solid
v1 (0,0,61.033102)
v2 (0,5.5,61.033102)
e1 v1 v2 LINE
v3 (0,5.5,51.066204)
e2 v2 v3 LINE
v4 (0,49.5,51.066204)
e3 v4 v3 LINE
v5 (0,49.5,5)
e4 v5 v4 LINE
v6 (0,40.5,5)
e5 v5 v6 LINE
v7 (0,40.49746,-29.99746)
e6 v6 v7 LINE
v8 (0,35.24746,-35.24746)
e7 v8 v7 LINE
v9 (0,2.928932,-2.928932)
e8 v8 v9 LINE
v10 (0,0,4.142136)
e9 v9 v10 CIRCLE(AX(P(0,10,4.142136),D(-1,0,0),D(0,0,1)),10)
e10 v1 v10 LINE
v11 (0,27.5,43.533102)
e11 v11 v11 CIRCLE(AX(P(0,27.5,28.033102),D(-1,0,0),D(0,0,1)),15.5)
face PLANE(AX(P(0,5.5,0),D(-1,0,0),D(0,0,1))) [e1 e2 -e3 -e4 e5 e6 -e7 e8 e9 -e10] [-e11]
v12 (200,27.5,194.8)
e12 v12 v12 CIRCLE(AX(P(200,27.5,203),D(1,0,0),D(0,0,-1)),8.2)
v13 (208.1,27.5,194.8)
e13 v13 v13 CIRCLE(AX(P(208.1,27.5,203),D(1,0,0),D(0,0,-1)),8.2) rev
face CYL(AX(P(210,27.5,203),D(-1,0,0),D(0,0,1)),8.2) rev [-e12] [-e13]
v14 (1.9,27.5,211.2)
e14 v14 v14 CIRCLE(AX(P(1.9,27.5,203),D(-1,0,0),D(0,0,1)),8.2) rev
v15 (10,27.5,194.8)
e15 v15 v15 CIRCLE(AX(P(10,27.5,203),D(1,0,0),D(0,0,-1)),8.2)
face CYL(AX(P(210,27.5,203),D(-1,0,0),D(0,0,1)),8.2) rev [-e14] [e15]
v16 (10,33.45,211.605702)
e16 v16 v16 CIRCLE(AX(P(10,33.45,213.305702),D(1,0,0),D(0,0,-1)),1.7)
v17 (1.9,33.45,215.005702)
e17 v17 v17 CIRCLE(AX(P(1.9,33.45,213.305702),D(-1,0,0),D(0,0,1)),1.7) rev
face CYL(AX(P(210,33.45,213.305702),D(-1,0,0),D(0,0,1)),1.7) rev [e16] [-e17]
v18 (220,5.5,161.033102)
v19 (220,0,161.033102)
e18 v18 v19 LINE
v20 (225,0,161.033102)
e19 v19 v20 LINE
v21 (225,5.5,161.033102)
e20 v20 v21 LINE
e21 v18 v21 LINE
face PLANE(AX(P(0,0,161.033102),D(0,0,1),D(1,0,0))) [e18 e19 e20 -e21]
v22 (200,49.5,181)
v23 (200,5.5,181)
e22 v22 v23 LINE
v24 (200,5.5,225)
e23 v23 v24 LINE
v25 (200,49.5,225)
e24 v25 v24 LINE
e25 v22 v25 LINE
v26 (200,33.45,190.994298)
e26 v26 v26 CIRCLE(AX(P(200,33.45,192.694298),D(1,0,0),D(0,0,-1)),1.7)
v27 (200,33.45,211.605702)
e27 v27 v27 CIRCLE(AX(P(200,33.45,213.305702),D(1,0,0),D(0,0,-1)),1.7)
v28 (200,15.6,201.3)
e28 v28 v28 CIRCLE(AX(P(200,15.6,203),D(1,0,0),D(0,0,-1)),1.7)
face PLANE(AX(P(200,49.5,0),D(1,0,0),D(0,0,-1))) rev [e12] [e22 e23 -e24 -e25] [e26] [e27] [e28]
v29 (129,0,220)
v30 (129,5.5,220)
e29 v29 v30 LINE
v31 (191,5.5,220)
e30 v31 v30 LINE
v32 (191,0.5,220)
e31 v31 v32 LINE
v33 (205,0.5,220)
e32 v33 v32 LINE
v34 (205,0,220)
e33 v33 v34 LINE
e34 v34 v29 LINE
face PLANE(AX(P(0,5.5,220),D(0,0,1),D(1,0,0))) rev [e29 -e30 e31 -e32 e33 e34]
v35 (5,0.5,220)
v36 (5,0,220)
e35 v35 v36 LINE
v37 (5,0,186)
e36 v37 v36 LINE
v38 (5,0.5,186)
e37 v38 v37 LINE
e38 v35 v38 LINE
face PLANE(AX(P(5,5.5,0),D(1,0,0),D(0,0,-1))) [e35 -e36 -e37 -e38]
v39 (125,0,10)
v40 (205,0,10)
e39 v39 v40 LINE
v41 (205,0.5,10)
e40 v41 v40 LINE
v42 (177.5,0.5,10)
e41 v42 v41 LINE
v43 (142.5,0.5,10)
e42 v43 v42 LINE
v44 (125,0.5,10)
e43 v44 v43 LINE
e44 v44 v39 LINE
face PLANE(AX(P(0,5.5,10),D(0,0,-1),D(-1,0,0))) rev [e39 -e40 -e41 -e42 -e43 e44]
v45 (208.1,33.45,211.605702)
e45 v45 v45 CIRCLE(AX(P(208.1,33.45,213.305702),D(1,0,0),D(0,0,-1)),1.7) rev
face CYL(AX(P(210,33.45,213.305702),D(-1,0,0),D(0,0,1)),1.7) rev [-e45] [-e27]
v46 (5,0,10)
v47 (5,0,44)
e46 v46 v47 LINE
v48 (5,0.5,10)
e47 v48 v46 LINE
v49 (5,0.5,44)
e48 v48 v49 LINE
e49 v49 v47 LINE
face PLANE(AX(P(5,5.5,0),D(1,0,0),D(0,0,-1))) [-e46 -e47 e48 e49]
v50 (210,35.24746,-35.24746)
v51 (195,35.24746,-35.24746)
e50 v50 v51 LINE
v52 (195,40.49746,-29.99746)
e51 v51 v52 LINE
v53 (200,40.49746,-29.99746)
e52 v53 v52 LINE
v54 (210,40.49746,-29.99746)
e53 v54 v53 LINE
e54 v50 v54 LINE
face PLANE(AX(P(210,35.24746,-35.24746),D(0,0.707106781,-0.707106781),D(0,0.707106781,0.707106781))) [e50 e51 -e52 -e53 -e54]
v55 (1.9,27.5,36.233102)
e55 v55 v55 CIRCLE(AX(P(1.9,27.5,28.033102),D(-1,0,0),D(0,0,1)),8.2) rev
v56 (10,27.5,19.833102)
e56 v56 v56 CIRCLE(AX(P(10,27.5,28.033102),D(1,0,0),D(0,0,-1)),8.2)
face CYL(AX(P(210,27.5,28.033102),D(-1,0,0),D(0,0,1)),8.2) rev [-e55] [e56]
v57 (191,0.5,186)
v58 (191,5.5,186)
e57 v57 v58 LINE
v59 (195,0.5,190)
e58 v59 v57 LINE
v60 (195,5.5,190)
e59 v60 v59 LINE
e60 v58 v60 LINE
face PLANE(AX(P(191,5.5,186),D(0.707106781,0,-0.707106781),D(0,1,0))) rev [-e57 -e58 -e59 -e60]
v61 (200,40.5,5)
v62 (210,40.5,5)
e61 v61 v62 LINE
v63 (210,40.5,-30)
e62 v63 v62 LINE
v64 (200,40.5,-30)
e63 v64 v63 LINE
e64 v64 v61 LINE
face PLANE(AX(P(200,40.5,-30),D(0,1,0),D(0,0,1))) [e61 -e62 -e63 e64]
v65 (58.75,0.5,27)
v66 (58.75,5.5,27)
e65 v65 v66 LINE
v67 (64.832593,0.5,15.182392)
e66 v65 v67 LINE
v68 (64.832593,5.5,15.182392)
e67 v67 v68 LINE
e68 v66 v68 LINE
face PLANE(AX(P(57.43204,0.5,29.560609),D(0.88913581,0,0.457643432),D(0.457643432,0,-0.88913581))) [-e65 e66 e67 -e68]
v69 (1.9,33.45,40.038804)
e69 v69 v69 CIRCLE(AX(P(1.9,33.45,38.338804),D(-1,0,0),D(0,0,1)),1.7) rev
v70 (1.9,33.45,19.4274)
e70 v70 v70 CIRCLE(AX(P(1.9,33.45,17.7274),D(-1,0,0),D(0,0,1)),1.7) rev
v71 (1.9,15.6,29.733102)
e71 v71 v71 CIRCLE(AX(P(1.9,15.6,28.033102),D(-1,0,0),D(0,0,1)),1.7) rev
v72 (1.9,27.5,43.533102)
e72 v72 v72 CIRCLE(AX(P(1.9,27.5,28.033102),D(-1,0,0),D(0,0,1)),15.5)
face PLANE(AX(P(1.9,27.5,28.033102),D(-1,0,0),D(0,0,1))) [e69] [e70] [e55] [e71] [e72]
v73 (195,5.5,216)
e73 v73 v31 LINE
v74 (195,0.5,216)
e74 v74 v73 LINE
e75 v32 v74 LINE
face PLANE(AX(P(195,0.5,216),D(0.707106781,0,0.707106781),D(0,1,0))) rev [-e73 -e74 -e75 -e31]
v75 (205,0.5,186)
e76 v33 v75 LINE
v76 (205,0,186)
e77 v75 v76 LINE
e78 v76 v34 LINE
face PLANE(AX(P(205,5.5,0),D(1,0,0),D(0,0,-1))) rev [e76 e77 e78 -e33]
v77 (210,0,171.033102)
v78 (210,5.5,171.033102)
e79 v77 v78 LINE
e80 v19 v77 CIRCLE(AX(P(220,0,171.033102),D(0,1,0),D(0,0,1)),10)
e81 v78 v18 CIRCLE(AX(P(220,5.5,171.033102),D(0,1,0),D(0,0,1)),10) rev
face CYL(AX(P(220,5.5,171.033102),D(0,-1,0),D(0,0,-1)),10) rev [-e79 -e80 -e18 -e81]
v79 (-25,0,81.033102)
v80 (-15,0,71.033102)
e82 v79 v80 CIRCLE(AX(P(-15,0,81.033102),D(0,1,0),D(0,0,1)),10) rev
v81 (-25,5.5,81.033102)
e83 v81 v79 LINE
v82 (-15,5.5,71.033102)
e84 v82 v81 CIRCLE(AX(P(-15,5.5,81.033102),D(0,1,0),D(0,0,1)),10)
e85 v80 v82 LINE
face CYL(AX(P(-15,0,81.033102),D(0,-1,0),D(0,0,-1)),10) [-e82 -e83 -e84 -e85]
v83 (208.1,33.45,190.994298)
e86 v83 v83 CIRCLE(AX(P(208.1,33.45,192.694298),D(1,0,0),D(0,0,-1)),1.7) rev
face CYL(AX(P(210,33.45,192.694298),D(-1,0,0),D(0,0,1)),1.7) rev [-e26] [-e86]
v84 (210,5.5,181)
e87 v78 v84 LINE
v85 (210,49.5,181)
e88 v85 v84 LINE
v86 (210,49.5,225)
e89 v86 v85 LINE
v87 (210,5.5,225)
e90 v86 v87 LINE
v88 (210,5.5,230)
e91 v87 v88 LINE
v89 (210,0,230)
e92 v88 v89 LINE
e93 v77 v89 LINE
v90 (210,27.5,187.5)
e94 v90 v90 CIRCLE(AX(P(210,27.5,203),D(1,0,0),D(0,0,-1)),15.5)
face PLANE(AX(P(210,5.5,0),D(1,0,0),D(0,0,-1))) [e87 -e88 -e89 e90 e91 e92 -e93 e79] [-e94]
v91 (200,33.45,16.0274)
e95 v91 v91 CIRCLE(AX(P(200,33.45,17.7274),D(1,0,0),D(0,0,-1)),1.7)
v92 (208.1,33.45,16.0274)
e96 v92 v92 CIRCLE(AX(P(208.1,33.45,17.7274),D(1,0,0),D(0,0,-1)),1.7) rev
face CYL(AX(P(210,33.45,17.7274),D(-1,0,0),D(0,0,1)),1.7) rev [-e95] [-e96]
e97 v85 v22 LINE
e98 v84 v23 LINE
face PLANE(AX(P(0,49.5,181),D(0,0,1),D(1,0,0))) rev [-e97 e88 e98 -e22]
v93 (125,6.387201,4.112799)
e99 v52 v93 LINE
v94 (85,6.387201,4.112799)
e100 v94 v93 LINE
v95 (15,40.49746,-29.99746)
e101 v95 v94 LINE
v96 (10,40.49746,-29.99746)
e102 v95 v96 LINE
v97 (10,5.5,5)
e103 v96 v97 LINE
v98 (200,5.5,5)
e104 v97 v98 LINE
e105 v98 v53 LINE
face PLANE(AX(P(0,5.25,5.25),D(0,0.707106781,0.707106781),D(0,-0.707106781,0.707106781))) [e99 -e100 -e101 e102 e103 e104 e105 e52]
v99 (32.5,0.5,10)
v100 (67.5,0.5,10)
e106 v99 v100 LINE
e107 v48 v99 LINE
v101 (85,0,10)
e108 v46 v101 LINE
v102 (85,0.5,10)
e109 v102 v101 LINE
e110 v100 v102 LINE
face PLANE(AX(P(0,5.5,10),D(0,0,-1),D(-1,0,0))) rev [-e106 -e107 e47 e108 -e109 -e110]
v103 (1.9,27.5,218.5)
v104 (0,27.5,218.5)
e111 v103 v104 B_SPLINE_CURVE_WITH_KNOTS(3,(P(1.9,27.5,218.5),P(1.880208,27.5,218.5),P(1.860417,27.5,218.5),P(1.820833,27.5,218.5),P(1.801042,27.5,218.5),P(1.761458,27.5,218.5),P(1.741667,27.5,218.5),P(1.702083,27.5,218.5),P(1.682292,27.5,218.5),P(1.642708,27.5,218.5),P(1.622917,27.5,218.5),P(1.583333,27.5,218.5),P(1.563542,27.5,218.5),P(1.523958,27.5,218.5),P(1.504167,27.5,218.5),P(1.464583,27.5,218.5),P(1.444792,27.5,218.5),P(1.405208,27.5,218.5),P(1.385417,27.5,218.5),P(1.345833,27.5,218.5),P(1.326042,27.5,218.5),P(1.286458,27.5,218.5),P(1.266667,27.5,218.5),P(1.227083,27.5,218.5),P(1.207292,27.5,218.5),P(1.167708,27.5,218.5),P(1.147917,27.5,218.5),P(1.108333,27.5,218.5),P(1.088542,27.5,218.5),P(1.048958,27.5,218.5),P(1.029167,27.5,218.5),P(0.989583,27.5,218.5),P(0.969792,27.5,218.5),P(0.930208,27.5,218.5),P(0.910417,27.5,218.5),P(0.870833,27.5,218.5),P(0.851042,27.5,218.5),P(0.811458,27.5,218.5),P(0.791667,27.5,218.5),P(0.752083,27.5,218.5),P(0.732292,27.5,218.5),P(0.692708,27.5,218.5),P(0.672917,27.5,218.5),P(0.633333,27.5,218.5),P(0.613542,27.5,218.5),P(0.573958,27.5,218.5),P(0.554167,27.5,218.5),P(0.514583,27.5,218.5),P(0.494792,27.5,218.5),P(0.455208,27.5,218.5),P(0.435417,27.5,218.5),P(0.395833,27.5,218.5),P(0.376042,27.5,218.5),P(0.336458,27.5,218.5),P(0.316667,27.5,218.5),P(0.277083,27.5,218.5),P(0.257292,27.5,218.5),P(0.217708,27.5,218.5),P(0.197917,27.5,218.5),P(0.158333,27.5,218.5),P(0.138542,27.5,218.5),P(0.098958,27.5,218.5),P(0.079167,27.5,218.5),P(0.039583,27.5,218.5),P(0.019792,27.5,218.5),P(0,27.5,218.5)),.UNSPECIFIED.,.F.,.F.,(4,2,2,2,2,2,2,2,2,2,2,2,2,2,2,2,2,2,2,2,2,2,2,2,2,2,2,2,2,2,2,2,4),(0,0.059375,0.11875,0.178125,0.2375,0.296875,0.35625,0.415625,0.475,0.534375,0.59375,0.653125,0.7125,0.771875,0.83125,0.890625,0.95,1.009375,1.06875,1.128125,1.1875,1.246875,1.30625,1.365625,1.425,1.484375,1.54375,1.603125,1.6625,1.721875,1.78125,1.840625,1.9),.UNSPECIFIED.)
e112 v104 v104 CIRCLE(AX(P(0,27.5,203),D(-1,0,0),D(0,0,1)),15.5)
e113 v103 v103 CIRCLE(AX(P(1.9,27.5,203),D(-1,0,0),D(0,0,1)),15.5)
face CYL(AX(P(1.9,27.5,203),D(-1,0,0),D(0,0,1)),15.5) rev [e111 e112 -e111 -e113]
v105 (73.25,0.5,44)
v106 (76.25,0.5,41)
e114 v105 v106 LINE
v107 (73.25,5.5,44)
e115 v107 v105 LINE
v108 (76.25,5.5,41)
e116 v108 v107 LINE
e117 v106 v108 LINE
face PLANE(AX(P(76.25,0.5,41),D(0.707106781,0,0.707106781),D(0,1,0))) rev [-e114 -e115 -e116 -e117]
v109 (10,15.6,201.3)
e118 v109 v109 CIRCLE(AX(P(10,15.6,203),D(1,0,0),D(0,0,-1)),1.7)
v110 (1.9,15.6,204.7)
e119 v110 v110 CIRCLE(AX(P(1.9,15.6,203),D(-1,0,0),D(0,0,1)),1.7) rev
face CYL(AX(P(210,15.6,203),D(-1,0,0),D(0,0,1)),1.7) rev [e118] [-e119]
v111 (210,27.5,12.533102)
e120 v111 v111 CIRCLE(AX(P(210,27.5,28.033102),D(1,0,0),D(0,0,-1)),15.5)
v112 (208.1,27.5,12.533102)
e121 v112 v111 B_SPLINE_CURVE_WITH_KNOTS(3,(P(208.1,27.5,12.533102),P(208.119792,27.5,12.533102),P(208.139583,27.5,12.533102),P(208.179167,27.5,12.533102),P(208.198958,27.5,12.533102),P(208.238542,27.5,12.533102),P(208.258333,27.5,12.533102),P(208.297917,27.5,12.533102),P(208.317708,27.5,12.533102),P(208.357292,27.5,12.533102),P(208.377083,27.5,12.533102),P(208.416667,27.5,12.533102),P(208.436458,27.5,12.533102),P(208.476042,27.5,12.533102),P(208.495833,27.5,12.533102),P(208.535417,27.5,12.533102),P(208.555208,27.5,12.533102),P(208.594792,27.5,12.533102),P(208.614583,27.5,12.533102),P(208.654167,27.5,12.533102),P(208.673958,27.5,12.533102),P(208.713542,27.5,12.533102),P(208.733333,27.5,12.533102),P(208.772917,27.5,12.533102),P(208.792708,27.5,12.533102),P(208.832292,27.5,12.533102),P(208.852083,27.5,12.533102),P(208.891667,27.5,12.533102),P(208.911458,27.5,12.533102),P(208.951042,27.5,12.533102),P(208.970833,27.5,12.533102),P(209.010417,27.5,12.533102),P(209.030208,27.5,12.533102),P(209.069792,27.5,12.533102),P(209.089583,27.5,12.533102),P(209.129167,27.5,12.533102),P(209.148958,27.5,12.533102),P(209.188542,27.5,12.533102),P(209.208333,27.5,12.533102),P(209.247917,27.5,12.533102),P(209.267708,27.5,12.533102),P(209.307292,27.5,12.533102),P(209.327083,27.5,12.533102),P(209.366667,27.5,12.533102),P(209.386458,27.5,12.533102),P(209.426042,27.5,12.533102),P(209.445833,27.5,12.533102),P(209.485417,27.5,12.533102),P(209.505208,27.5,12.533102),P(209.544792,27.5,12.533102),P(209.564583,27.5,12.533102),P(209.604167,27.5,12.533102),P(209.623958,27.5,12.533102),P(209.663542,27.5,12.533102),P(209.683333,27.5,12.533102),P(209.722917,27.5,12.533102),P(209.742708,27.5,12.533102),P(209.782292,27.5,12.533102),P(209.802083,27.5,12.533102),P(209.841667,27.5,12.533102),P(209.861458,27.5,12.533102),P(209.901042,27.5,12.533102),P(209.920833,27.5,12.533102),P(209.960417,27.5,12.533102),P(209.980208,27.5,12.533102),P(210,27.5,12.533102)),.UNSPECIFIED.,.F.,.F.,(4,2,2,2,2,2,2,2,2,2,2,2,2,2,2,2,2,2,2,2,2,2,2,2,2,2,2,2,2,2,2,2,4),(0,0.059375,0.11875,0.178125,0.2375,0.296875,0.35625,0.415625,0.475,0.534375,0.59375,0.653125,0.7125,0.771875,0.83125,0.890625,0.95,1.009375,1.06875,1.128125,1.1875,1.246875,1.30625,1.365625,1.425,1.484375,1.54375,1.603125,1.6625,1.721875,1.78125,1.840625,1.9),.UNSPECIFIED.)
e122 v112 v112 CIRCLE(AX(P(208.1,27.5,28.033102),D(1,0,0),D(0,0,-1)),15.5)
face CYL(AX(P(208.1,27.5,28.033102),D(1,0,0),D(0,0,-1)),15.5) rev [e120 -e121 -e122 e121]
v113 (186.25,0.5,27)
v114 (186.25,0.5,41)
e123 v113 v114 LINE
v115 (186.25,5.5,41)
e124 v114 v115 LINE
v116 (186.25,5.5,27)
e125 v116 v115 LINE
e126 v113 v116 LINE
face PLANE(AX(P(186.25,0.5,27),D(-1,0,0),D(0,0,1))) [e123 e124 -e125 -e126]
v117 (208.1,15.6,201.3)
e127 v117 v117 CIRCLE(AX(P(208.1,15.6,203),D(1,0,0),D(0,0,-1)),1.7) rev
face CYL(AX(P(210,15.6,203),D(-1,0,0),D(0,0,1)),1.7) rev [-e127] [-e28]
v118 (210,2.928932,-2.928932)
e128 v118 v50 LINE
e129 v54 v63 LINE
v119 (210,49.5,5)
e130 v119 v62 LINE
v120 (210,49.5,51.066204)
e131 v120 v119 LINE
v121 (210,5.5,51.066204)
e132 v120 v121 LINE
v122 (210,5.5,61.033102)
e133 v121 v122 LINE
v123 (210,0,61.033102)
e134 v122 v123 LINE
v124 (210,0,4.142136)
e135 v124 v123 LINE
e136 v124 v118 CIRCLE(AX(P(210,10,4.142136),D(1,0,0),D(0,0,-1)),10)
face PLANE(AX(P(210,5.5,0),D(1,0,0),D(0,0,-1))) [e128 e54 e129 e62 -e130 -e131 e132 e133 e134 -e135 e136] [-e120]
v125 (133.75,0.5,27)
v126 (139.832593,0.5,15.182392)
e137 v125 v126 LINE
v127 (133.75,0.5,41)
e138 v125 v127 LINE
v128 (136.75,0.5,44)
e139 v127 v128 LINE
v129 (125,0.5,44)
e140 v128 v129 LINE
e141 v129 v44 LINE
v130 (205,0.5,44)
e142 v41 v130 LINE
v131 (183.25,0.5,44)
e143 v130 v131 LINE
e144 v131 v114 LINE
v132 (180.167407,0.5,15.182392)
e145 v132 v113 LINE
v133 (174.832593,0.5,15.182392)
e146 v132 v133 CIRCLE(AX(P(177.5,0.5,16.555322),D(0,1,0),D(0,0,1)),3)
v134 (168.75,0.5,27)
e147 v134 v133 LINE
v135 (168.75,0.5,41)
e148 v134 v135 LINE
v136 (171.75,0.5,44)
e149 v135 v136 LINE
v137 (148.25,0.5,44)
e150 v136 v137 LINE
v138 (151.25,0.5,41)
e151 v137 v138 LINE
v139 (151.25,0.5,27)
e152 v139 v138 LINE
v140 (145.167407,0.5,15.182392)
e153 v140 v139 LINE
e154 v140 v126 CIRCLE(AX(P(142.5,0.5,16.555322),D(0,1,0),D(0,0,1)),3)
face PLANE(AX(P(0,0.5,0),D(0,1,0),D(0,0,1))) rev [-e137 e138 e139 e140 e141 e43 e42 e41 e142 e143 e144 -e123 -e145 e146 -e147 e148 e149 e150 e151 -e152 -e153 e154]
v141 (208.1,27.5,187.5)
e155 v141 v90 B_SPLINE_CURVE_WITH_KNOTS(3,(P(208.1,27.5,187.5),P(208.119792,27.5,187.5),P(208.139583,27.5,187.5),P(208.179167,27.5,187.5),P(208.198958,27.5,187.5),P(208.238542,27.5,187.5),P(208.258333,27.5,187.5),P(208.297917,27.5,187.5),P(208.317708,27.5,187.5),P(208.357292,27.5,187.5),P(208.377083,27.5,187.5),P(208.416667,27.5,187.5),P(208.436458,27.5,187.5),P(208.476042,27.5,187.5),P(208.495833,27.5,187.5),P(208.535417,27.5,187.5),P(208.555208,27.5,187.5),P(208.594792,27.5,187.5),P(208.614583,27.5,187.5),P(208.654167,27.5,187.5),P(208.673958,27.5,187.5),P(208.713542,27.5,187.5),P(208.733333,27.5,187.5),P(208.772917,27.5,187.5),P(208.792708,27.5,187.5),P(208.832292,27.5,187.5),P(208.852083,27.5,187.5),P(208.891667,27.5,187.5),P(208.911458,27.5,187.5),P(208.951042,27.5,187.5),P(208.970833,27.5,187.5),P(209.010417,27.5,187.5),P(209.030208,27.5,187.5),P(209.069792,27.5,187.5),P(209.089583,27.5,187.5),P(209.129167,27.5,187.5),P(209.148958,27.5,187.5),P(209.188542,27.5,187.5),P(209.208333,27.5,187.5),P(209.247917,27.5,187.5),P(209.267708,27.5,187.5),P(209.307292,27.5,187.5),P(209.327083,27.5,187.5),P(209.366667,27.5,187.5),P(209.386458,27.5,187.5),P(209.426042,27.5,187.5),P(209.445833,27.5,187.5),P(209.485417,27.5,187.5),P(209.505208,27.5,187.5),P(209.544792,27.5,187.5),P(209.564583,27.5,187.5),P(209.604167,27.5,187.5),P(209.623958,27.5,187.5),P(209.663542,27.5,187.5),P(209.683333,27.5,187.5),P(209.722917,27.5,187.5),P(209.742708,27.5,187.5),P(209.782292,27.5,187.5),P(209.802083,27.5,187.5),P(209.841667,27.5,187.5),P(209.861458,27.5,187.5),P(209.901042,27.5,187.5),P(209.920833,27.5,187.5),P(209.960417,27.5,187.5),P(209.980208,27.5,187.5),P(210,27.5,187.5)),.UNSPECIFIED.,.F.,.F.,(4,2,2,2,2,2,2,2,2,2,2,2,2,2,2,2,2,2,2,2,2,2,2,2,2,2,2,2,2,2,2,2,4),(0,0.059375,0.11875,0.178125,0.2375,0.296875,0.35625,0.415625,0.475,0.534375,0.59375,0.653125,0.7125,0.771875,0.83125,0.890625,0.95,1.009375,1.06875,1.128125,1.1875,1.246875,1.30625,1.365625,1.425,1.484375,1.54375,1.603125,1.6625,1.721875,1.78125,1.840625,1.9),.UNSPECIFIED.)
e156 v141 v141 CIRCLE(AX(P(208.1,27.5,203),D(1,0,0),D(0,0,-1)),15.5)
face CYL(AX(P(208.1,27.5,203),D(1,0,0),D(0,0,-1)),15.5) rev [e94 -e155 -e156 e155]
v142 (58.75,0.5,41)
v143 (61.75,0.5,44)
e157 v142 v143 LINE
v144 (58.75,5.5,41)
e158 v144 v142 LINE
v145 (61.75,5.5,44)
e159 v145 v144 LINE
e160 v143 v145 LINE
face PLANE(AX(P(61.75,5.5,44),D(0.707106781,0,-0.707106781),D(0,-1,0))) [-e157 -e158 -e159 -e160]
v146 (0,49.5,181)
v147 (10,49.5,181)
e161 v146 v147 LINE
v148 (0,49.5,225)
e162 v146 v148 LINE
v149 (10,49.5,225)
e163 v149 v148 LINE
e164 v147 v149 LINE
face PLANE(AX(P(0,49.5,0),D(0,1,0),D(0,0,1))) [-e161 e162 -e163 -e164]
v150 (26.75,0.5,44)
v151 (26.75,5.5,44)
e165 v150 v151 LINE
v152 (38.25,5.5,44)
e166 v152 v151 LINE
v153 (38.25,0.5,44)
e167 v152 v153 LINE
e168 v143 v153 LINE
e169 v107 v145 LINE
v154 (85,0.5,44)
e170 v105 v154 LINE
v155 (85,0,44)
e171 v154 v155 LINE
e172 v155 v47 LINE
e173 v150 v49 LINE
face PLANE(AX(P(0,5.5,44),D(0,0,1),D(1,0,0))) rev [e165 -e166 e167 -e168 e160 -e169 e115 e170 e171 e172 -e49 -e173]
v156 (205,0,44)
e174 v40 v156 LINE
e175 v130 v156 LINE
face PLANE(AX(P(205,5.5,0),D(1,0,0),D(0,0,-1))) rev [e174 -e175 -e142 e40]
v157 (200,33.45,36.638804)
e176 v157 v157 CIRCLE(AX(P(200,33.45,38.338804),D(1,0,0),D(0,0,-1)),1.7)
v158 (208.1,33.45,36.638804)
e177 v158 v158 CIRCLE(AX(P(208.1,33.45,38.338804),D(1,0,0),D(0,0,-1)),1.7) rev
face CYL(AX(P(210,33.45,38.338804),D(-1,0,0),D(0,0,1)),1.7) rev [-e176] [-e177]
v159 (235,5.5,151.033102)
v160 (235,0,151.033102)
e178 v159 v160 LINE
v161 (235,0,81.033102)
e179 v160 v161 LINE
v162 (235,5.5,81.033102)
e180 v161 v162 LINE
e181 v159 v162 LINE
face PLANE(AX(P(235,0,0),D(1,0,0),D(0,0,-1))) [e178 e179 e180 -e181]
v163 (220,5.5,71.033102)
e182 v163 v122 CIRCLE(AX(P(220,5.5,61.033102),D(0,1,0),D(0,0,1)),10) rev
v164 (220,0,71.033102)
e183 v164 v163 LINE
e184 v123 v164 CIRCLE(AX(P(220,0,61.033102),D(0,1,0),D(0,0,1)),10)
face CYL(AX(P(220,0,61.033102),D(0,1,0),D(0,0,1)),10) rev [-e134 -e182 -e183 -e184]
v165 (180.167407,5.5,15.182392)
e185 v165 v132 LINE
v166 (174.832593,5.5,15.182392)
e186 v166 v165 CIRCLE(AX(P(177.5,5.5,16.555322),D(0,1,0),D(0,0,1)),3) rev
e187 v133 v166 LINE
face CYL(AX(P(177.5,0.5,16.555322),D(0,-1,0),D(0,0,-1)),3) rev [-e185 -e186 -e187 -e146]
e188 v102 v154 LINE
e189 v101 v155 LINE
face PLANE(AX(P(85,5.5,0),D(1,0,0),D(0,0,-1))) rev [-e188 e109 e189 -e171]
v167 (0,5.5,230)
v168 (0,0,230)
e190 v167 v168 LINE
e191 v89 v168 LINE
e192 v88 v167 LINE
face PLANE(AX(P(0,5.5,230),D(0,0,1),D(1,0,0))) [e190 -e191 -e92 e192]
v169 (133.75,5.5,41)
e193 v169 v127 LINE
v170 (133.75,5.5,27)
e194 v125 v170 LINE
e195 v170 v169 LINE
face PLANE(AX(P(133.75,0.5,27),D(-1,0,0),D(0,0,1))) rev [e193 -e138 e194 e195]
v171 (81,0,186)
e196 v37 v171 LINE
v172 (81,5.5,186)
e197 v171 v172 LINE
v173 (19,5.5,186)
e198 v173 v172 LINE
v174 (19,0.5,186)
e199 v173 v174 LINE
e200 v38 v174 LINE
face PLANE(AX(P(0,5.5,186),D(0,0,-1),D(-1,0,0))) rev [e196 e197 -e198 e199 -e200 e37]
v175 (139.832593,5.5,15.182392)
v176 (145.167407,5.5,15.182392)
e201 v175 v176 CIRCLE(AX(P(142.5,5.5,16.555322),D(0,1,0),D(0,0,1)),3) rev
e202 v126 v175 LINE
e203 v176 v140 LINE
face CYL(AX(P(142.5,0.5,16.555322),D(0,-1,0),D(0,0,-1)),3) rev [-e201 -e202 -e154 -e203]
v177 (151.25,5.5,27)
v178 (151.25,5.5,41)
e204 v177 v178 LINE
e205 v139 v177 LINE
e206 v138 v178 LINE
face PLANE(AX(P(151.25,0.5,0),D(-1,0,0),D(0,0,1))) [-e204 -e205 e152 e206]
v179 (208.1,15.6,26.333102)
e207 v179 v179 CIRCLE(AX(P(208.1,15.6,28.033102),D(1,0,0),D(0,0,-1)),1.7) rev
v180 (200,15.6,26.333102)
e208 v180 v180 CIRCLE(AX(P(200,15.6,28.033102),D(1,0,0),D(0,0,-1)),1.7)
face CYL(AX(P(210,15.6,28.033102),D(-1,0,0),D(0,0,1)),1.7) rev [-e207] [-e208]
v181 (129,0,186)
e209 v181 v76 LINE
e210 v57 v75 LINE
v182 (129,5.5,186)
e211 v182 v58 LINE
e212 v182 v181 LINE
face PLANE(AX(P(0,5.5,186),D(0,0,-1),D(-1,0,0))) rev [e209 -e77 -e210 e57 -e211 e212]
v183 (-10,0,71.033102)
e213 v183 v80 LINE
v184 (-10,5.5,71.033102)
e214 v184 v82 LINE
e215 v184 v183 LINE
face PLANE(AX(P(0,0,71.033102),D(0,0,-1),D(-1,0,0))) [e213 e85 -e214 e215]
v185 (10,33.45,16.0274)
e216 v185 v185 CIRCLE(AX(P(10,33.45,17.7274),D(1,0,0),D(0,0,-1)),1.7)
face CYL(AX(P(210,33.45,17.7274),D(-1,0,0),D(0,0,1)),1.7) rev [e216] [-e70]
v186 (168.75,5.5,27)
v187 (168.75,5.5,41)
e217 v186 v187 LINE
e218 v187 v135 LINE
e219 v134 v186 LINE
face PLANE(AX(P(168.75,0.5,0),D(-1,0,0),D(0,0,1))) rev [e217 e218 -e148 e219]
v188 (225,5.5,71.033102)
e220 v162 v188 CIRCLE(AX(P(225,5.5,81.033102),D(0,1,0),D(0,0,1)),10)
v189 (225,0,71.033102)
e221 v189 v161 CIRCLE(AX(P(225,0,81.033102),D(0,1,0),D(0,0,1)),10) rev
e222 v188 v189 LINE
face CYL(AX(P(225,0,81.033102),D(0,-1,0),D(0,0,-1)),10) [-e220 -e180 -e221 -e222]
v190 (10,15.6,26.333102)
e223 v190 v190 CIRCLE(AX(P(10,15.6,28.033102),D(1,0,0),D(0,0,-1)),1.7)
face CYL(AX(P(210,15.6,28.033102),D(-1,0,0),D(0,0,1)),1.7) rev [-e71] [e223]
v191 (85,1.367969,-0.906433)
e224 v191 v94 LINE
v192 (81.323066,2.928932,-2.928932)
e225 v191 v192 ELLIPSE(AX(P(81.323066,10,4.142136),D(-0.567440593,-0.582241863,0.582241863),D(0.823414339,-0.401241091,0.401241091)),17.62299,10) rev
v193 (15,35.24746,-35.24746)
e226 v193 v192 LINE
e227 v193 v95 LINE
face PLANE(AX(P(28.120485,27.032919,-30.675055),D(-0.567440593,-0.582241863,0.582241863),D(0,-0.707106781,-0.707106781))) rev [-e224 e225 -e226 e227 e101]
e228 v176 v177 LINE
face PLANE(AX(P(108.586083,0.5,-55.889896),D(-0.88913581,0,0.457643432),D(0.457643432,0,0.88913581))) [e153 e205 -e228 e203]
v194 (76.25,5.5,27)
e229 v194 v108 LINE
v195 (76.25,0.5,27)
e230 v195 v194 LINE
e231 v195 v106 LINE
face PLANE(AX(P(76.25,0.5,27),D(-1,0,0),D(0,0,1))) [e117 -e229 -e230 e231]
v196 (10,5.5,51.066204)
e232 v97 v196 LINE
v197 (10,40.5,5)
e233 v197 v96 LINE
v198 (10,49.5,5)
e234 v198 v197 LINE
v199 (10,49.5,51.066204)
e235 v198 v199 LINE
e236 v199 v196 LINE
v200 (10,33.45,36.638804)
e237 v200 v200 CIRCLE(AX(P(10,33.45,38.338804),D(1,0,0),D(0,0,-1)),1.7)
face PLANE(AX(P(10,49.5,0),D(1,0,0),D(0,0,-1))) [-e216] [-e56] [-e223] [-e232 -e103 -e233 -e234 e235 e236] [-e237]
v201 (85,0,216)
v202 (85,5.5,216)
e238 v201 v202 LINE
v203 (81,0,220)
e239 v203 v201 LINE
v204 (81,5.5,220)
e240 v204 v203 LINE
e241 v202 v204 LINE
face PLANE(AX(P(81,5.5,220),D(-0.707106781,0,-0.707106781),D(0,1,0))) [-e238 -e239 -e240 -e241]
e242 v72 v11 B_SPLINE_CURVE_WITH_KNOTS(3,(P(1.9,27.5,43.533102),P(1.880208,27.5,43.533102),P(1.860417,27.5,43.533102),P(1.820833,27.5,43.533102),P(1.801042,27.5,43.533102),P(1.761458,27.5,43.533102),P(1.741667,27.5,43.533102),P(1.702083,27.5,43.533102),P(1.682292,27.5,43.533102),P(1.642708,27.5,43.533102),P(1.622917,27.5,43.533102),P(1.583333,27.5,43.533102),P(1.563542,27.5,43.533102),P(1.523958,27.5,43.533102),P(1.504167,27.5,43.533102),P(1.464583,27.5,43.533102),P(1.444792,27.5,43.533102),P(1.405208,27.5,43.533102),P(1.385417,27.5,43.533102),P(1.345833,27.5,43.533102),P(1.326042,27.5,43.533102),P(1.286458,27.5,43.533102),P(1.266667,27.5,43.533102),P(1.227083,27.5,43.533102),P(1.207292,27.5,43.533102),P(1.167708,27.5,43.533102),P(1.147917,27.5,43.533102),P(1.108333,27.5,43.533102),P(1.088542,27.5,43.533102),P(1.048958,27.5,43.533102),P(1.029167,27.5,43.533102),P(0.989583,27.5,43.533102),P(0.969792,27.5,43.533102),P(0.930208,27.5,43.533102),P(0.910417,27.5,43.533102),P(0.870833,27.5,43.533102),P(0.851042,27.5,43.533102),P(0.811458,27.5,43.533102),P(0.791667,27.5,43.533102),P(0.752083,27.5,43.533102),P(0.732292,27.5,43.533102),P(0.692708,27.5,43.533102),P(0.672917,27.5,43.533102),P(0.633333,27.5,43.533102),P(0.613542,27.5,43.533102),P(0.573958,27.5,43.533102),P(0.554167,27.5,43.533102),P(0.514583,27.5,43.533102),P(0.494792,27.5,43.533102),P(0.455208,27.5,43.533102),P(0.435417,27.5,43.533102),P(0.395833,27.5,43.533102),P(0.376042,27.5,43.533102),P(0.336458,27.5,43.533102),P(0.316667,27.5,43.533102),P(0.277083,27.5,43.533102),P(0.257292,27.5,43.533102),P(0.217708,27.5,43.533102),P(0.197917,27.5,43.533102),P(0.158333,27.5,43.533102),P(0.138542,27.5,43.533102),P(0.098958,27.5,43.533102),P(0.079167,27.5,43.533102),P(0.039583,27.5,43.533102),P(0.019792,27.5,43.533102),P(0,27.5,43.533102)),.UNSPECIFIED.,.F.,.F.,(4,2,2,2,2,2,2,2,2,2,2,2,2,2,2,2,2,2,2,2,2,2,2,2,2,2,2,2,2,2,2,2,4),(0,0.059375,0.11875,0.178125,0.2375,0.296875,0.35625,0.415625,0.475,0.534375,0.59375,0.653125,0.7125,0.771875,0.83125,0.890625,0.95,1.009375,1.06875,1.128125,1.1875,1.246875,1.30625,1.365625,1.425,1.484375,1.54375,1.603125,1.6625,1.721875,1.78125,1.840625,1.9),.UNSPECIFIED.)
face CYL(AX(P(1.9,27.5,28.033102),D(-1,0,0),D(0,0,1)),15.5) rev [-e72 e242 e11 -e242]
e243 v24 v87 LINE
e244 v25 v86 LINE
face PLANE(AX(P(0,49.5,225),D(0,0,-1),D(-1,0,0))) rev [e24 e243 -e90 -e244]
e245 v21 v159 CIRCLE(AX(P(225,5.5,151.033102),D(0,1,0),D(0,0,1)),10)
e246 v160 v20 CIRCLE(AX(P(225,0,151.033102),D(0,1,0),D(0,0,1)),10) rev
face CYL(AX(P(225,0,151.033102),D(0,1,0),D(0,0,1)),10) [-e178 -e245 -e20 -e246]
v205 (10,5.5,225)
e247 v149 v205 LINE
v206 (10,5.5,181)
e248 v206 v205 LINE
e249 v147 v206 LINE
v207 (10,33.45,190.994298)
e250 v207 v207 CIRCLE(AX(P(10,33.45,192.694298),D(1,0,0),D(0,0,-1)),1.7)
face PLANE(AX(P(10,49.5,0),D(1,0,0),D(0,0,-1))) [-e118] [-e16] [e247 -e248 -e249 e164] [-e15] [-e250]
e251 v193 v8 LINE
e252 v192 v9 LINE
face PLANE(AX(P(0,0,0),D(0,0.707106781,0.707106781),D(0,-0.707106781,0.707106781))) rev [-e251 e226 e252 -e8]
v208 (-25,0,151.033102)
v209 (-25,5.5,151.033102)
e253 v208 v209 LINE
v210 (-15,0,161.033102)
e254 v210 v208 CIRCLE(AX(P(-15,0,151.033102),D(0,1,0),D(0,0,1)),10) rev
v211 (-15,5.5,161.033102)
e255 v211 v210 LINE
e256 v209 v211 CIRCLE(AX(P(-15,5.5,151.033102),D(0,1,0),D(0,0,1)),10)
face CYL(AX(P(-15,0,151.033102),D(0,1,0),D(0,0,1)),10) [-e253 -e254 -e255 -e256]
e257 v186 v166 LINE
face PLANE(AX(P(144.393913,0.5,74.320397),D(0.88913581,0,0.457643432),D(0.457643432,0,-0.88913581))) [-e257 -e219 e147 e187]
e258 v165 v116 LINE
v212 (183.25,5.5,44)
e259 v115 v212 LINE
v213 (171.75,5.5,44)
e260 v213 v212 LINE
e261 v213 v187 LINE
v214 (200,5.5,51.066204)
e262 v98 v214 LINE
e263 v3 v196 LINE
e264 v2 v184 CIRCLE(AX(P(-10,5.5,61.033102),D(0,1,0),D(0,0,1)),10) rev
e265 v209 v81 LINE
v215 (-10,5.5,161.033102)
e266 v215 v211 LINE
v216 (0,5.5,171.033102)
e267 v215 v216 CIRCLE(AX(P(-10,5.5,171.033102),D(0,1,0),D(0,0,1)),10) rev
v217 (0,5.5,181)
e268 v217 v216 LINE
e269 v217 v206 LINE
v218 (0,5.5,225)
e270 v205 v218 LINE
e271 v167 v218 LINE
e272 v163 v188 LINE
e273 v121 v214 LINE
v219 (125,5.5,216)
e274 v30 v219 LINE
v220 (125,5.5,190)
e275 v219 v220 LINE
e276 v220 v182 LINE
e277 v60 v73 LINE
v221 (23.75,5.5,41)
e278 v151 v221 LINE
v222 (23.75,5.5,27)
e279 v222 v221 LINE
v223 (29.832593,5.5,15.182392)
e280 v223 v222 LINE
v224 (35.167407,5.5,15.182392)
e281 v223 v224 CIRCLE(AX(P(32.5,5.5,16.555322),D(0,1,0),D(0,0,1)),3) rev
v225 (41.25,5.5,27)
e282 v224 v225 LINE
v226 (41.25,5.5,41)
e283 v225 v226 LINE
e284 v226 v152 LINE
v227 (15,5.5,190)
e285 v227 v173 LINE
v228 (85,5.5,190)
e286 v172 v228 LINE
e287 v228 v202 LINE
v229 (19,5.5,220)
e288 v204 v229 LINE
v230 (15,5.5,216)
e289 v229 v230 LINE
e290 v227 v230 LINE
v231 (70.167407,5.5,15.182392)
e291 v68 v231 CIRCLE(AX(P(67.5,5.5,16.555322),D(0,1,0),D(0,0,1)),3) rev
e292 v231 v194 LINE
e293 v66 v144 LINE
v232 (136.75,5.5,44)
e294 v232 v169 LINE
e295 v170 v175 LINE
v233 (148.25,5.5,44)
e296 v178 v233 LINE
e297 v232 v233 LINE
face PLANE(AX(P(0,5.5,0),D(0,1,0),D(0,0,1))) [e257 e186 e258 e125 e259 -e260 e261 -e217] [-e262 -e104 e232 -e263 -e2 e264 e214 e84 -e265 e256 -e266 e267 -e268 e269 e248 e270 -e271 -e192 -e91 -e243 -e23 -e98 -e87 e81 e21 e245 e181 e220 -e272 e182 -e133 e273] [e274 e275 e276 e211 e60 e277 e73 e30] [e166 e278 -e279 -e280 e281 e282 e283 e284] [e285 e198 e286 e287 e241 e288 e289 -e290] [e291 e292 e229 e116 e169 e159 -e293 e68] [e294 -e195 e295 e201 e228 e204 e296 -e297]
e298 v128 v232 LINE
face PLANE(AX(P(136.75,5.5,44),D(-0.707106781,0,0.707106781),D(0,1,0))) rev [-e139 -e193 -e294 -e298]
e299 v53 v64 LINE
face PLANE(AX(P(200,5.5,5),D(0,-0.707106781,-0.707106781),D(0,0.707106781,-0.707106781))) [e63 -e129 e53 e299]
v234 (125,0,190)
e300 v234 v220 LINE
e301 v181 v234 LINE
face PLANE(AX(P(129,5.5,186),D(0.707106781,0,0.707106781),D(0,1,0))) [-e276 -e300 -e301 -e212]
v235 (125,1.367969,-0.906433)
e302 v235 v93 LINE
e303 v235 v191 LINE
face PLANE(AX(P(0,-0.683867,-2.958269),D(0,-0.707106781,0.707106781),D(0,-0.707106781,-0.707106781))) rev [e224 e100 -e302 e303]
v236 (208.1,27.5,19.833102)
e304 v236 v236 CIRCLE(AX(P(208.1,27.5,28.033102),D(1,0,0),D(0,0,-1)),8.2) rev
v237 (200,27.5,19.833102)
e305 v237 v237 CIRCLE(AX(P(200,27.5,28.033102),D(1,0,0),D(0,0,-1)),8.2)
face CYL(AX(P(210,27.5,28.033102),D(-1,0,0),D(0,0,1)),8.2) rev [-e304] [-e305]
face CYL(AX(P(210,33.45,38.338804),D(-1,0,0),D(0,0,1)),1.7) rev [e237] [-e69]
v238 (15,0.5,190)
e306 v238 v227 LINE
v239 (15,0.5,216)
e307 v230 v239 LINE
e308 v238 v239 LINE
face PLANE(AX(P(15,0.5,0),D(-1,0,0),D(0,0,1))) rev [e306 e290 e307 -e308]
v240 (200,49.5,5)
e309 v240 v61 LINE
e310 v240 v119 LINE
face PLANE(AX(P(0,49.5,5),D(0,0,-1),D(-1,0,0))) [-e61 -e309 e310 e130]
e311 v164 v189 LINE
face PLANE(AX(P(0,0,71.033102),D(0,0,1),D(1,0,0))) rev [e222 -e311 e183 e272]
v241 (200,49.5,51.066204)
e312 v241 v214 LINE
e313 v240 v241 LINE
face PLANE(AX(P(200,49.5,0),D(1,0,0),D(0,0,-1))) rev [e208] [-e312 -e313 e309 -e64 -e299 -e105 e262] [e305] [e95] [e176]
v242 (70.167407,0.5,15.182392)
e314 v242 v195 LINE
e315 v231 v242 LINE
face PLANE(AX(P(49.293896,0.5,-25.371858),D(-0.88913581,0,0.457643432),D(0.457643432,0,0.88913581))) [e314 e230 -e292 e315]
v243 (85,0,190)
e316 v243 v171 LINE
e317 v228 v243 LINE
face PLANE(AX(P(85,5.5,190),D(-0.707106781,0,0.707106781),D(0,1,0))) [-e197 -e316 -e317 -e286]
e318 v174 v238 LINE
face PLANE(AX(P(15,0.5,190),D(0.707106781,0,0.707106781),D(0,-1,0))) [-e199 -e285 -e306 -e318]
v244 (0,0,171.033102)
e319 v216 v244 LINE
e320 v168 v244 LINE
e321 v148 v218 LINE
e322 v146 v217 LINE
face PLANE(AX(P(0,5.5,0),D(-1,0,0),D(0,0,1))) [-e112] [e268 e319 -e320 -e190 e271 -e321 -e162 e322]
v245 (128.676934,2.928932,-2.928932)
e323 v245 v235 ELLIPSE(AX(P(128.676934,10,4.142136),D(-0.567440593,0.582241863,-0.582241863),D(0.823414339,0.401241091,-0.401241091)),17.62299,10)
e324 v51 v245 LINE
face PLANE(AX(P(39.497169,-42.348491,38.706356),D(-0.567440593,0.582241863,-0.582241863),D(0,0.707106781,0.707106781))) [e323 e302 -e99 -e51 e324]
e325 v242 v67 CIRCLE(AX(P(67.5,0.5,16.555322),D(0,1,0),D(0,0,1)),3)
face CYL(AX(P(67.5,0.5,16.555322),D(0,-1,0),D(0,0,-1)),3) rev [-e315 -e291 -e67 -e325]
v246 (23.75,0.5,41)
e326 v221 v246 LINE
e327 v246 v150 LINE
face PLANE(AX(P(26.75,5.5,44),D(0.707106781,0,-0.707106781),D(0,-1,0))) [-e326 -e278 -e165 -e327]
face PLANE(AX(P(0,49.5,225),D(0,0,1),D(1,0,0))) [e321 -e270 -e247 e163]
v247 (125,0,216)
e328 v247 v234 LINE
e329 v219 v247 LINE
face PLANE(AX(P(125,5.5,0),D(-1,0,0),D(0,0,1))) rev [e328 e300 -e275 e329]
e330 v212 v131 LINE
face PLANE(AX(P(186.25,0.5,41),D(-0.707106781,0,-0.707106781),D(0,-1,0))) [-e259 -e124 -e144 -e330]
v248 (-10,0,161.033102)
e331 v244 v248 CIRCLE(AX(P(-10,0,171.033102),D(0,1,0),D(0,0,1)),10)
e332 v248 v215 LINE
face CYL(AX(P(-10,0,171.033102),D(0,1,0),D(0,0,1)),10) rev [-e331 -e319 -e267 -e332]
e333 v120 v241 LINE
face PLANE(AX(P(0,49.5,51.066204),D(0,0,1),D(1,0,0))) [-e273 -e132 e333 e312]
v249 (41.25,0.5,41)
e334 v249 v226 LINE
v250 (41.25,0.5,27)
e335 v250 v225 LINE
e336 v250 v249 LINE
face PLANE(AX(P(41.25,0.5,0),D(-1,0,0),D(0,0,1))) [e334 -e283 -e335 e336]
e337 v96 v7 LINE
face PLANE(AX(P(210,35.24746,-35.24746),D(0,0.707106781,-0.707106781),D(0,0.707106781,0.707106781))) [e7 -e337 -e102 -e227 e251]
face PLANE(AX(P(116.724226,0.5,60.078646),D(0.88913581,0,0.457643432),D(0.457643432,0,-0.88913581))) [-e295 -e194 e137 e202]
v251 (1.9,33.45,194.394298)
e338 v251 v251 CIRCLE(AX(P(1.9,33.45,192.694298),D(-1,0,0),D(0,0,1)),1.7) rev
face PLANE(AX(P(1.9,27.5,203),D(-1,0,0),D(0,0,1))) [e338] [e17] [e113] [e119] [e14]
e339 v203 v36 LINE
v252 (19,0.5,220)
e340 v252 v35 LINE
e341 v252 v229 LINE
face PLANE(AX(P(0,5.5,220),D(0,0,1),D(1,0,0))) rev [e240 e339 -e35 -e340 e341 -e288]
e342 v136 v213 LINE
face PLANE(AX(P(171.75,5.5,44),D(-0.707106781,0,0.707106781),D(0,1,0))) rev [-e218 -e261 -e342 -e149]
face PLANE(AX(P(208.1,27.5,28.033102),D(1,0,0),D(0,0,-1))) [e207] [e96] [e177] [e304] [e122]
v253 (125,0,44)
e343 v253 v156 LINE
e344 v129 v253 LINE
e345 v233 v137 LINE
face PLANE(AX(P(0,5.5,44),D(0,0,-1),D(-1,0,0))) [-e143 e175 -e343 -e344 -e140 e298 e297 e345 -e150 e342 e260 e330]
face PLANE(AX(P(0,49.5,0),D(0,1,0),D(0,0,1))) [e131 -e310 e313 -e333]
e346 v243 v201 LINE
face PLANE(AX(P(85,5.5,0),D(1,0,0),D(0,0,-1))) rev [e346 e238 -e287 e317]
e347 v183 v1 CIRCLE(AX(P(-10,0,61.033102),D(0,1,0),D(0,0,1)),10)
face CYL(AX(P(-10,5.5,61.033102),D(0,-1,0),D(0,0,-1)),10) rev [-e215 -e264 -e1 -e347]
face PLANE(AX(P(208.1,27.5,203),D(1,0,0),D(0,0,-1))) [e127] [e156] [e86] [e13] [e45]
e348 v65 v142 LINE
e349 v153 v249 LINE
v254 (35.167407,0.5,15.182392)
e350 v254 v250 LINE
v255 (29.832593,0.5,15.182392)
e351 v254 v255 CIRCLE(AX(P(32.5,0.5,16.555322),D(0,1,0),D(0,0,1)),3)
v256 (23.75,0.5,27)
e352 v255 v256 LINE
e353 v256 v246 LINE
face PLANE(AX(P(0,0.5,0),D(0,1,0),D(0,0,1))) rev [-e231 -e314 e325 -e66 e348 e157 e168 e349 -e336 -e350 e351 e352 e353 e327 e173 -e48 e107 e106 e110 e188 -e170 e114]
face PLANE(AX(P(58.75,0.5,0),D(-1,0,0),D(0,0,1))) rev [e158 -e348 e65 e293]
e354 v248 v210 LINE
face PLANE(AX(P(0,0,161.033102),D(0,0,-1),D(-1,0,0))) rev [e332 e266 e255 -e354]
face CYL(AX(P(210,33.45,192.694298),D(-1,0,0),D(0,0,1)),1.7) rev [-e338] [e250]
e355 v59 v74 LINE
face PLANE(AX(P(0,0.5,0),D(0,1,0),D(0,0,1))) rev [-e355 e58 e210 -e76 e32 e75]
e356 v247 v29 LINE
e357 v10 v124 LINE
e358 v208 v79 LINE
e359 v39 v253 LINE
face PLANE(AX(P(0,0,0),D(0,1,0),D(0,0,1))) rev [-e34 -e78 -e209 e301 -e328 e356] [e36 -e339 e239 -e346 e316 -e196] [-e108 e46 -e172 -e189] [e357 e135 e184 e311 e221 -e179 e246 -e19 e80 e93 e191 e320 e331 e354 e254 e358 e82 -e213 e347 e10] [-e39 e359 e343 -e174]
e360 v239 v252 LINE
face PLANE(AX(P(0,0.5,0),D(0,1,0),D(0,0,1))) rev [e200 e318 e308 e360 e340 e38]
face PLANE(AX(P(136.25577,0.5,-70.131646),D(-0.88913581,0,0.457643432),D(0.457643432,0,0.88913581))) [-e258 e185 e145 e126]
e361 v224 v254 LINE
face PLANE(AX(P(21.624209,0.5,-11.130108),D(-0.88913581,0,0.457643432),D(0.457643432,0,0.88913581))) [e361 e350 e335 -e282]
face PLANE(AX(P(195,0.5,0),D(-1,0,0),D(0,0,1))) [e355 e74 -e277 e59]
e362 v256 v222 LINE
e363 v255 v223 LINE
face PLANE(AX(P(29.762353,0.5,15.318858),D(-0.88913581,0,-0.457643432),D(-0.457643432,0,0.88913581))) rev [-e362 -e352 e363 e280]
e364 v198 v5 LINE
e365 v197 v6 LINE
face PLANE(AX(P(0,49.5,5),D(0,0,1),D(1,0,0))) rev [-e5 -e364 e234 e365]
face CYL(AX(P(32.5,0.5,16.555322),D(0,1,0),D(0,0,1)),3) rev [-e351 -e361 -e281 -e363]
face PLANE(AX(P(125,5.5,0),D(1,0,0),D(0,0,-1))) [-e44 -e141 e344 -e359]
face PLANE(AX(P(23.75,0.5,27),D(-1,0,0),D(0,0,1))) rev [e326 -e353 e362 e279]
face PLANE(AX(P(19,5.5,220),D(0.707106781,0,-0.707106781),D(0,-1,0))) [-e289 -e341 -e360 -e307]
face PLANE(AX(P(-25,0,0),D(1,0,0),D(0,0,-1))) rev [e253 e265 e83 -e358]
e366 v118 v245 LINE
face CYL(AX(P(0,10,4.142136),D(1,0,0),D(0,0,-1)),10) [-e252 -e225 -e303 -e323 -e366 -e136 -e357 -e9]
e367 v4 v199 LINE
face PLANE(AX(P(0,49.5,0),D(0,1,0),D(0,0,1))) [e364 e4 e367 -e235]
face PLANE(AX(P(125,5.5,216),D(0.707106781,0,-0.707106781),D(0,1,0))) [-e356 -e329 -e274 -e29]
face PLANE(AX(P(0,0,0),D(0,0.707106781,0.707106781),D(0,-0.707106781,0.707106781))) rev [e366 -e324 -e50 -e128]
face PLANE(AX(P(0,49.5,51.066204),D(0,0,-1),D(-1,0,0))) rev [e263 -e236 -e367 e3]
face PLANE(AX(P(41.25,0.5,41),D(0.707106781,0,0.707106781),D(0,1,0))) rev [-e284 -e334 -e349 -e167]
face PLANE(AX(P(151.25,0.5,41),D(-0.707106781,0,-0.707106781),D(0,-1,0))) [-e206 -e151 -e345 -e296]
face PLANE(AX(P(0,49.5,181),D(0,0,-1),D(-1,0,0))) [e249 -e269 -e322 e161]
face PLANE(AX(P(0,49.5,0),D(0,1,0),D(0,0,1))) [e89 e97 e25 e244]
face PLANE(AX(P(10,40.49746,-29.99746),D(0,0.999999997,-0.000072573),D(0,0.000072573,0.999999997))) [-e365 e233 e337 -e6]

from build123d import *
from build123d.topology import SkipClean

# Parameters (mm, degrees)
SKETCH_1_W               = 5
SKETCH_1_H               = 10
EXTRUDE_1_DEPTH          = 5.5
SKETCH_3_W               = 5
SKETCH_3_H               = 46.066203836
SKETCH_3_H_2             = 44
EXTRUDE_2_DEPTH          = 44
CUT_EXTRUDE_1_DEPTH      = 316.357337
CUT_EXTRUDE_1_DEPTH_BACK = 316.357337
SKETCH_4_R               = 8.2
SKETCH_4_R_2             = 1.7
SKETCH_5_R               = 15.5
CUT_EXTRUDE_3_DEPTH      = 1.9
CUT_EXTRUDE_START        = -1.9
SKETCH_6_R               = 15.5
CUT_EXTRUDE_4_DEPTH      = 1.9
CUT_EXTRUDE_5_DEPTH      = 316.357337
CUT_EXTRUDE_5_DEPTH_BACK = 316.357337
SKETCH_7_R               = 8.2
SKETCH_7_R_2             = 1.7
SKETCH_8_R               = 15.5
CUT_EXTRUDE_6_DEPTH      = 1.9
SKETCH_9_R               = 15.5
CUT_EXTRUDE_7_DEPTH      = 1.9
SKETCH_10_W              = 10
SKETCH_10_H              = 34
EXTRUDE_3_DEPTH          = 5
SKETCH_11_W              = 5
SKETCH_11_H              = 41.066203836
SKETCH_11_H_2            = 5
SKETCH_11_H_3            = 44
EXTRUDE_4_DEPTH          = 44
CUT_EXTRUDE_8_DEPTH      = 315.095304008
CUT_EXTRUDE_8_DEPTH_BACK = 315.095304008
SKETCH_12_R              = 1.7
SKETCH_12_R_2            = 8.2
SKETCH_17_W              = 210
SKETCH_17_H              = 49.493882771
EXTRUDE_5_DEPTH          = 7.424621
EXTRUDE_6_DEPTH          = 10
EXTRUDE_8_DEPTH          = 10
SKETCH_20_W              = 40
SKETCH_20_H              = 48.239190952
CUT_EXTRUDE_9_DEPTH      = 10
EXTRUDE_11_DEPTH         = 5
EXTRUDE_13_DEPTH         = 210
FILLET_1_R               = 10
EXTRUDE_14_DEPTH         = 5
SKETCH_26_W              = 25
SKETCH_26_H              = 90
EXTRUDE_15_DEPTH         = 5.5
FILLET_2_R               = 10
CHAMFER_1_SIZE           = 4
CHAMFER_2_SIZE           = 3
FILLET_3_R               = 3


with BuildPart() as part:
    # 草图1 → 凸台-拉伸1 (new body)
    with BuildSketch(Plane(origin=(0, 0, 0), x_dir=(1, 0, 0), z_dir=(0, 1, 0))):
        Polygon((85, -44), (5, -44), (5, -186), (85, -186), (85, -220), (125, -220), (125, -186), (205, -186), (205, -44), (125, -44), (125, -10), (85, -10), align=None)
        Polygon((3, 0), (0, 0), (0, -10), (5, -10), (5, 0), align=None)
        Polygon((5, -10), (0, -10), (0, -220), (5, -220), (5, -186), (5, -44), align=None)
        Polygon((205, 0), (5, 0), (5, -10), (85, -10), (125, -10), (205, -10), align=None)
        Polygon((210, -10), (205, -10), (205, -44), (205, -186), (205, -220), (210, -220), align=None)
        with Locations((207.5, -5)):
            Rectangle(SKETCH_1_W, SKETCH_1_H)
        Polygon((85, -220), (5, -220), (5, -230), (205, -230), (205, -220), (125, -220), align=None)
        with Locations((2.5, -225)):
            Rectangle(SKETCH_1_W, SKETCH_1_H)
        with Locations((207.5, -225)):
            Rectangle(SKETCH_1_W, SKETCH_1_H)
    extrude(amount=EXTRUDE_1_DEPTH)

    # 草图3 → 凸台-拉伸2 (add)
    with BuildSketch(Plane(origin=(0, 5.5, 0), x_dir=(1, 0, 0), z_dir=(0, 1, 0))):
        with Locations((2.5, -28.033101918)):
            Rectangle(SKETCH_3_W, SKETCH_3_H)
        with Locations((2.5, -203)):
            Rectangle(SKETCH_3_W, SKETCH_3_H_2)
        with Locations((207.5, -203)):
            Rectangle(SKETCH_3_W, SKETCH_3_H_2)
        with Locations((207.5, -28.033101918)):
            Rectangle(SKETCH_3_W, SKETCH_3_H)
    extrude(amount=EXTRUDE_2_DEPTH)

    # 草图4 → 切除-拉伸1 (cut, two sides: drawn at the far end of the back side and taken through both)
    with BuildSketch(Plane.ZY.offset(-CUT_EXTRUDE_1_DEPTH_BACK)):
        with Locations((28.033101918, 27.5)):
            Circle(SKETCH_4_R)
        with Locations((28.033101918, 15.6)):
            Circle(SKETCH_4_R_2)
        with Locations((17.727399613, 33.45)):
            Circle(SKETCH_4_R_2)
        with Locations((38.338804223, 33.45)):
            Circle(SKETCH_4_R_2)
    extrude(amount=CUT_EXTRUDE_1_DEPTH + CUT_EXTRUDE_1_DEPTH_BACK, mode=Mode.SUBTRACT)

    # 草图5 → 切除-拉伸3 (cut)
    with BuildSketch(Plane.ZY):
        with Locations((28.033101918, 27.5)):
            Circle(SKETCH_5_R)
    extrude(amount=-CUT_EXTRUDE_3_DEPTH, mode=Mode.SUBTRACT)

    # 草图6 → 切除-拉伸4 (cut)
    with BuildSketch(Plane(origin=(210, 0, 0), x_dir=(0, 0, -1), z_dir=(1, 0, 0)).offset(CUT_EXTRUDE_START)):
        with Locations(Location((-28.033101918, 27.5, 0), (0, 0, 180))):
            Circle(SKETCH_6_R)
    extrude(amount=CUT_EXTRUDE_4_DEPTH, mode=Mode.SUBTRACT)

    # 草图7 → 切除-拉伸5 (cut, two sides: drawn at the far end of the back side and taken through both)
    with BuildSketch(Plane.ZY.offset(-CUT_EXTRUDE_5_DEPTH_BACK)):
        with Locations((203, 27.5)):
            Circle(SKETCH_7_R)
        with Locations((203, 15.6)):
            Circle(SKETCH_7_R_2)
        with Locations((192.694297695, 33.45)):
            Circle(SKETCH_7_R_2)
        with Locations((213.305702305, 33.45)):
            Circle(SKETCH_7_R_2)
    extrude(amount=CUT_EXTRUDE_5_DEPTH + CUT_EXTRUDE_5_DEPTH_BACK, mode=Mode.SUBTRACT)

    # 草图8 → 切除-拉伸6 (cut)
    with BuildSketch(Plane.ZY):
        with Locations((203, 27.5)):
            Circle(SKETCH_8_R)
    extrude(amount=-CUT_EXTRUDE_6_DEPTH, mode=Mode.SUBTRACT)

    # 草图9 → 切除-拉伸7 (cut)
    with BuildSketch(Plane(origin=(210, 0, 0), x_dir=(0, 0, -1), z_dir=(1, 0, 0)).offset(CUT_EXTRUDE_START)):
        with Locations(Location((-203, 27.5, 0), (0, 0, 180))):
            Circle(SKETCH_9_R)
    extrude(amount=CUT_EXTRUDE_7_DEPTH, mode=Mode.SUBTRACT)

    # 草图10 → 凸台-拉伸3 (add)
    with BuildSketch(Plane(origin=(0, 5.5, 0), x_dir=(1, 0, 0), z_dir=(0, 1, 0))):
        with Locations((200, -27)):
            Rectangle(SKETCH_10_W, SKETCH_10_H)
        with Locations((10, -27)):
            Rectangle(SKETCH_10_W, SKETCH_10_H)
        with Locations((10, -203)):
            Rectangle(SKETCH_10_W, SKETCH_10_H)
        with Locations((200, -203)):
            Rectangle(SKETCH_10_W, SKETCH_10_H)
    extrude(amount=-EXTRUDE_3_DEPTH)

    # 草图11 → 凸台-拉伸4 (add)
    with BuildSketch(Plane(origin=(0, 5.5, 0), x_dir=(1, 0, 0), z_dir=(0, 1, 0))):
        with Locations((7.5, -30.533101918)):
            Rectangle(SKETCH_11_W, SKETCH_11_H)
        with Locations((7.5, -7.5)):
            Rectangle(SKETCH_11_W, SKETCH_11_H_2)
        with Locations((202.5, -7.5)):
            Rectangle(SKETCH_11_W, SKETCH_11_H_2)
        with Locations((202.5, -30.533101918)):
            Rectangle(SKETCH_11_W, SKETCH_11_H)
        with Locations((7.5, -203)):
            Rectangle(SKETCH_11_W, SKETCH_11_H_3)
        with Locations((202.5, -203)):
            Rectangle(SKETCH_11_W, SKETCH_11_H_3)
    extrude(amount=EXTRUDE_4_DEPTH)

    # 草图12 → 切除-拉伸8 (cut, two sides: drawn at the far end of the back side and taken through both)
    with BuildSketch(Plane.ZY.offset(-1.9).offset(-CUT_EXTRUDE_8_DEPTH_BACK)):
        with Locations(Location((17.727399613, 33.45, 0), (0, 0, 180))):
            Circle(SKETCH_12_R)
        with Locations(Location((38.338804223, 33.45, 0), (0, 0, 180))):
            Circle(SKETCH_12_R)
        with Locations(Location((28.033101918, 15.6, 0), (0, 0, 180))):
            Circle(SKETCH_12_R)
        with Locations(Location((28.033101918, 27.5, 0), (0, 0, 180))):
            Circle(SKETCH_12_R_2)
        with Locations(Location((192.694297695, 33.45, 0), (0, 0, 180))):
            Circle(SKETCH_12_R)
        with Locations(Location((213.305702305, 33.45, 0), (0, 0, 180))):
            Circle(SKETCH_12_R)
        with Locations(Location((203, 15.6, 0), (0, 0, 180))):
            Circle(SKETCH_12_R)
        with Locations(Location((203, 27.5, 0), (0, 0, 180))):
            Circle(SKETCH_12_R_2)
    extrude(amount=CUT_EXTRUDE_8_DEPTH + CUT_EXTRUDE_8_DEPTH_BACK, mode=Mode.SUBTRACT)

    # 草图17 → 凸台-拉伸5 (add, through all)
    with BuildSketch(Plane(origin=(0, 5.25, 5.25), x_dir=(1, 0, 0), z_dir=(0, 0.7071067811865464, 0.7071067811865487))):
        with Locations((105, 25.100494776)):
            Rectangle(SKETCH_17_W, SKETCH_17_H)
    extrude(amount=-EXTRUDE_5_DEPTH)

    # 草图18 → 凸台-拉伸6 (add)
    with BuildSketch(Plane.ZY):
        Polygon((-29.997460135, 40.497460135), (5, 40.5), (5, 5.5), align=None)
    extrude(amount=-EXTRUDE_6_DEPTH)

    # 草图19 → 凸台-拉伸8 (add)
    with BuildSketch(Plane(origin=(210, 0, 0), x_dir=(0, 0, -1), z_dir=(1, 0, 0))):
        Polygon((30, 40.5), (-5, 40.5), (-5, 5.5), align=None)
    extrude(amount=-EXTRUDE_8_DEPTH)

    # 草图20 → 切除-拉伸9 (cut)
    with BuildSketch(Plane(origin=(0, 5.25, 5.25), x_dir=(1, 0, 0), z_dir=(0, 0.7071067811865465, 0.7071067811865487))):
        Polygon((85, 49.847436162), (15, 49.847436162), (85, 1.60824521), align=None)
        with Locations((105, 25.727840686)):
            Rectangle(SKETCH_20_W, SKETCH_20_H)
        Polygon((125, 49.847436162), (125, 1.60824521), (195, 49.847436162), align=None)
    extrude(amount=-CUT_EXTRUDE_9_DEPTH, mode=Mode.SUBTRACT)

    # 草图21 → 凸台-拉伸11 (add)
    with BuildSketch(Plane(origin=(0, 5.5, 0), x_dir=(1, 0, 0), z_dir=(0, 1, 0))):
        Polygon((15, -44), (32.5, -10), (15, -10), align=None)
        Polygon((67.5, -10), (32.5, -10), (41.25, -27), (50, -44), (58.75, -27), align=None)
        Polygon((50, -44), (41.25, -27), (41.25, -44), align=None)
        Polygon((58.75, -27), (50, -44), (58.75, -44), align=None)
        Polygon((85, -10), (67.5, -10), (85, -44), align=None)
        Polygon((125, -10), (125, -44), (142.5, -10), align=None)
        Polygon((177.5, -10), (142.5, -10), (151.25, -27), (160, -44), (168.75, -27), align=None)
        Polygon((195, -10), (177.5, -10), (195, -44), align=None)
        Polygon((168.75, -27), (160, -44), (168.75, -44), align=None)
        Polygon((151.25, -27), (151.25, -44), (160, -44), align=None)
    extrude(amount=-EXTRUDE_11_DEPTH)

    # 草图22 → 凸台-拉伸13 (add)
    with SkipClean():  # the faces are left unmerged after this step: merging them gives an invalid solid
        with BuildSketch(Plane.ZY):
            Polygon((0, 0.5), (0, 0), (-0.25, 0.25), align=None)
        extrude(amount=-EXTRUDE_13_DEPTH)

    # 圆角1
    # the kernel refuses this fillet: 10 mm, written as the material it takes off along each edge
    with BuildSketch(Plane(origin=(220.355339059, 0, 0), x_dir=(0, 0, 1), z_dir=(-1, 0, 0))) as fillet_1_piece_1:
        with BuildLine():
            CenterArc((FILLET_1_R * 0.414213562373, FILLET_1_R), FILLET_1_R, 225, 45)
            Line((-FILLET_1_R * 0.292893218813, FILLET_1_R * 0.292893218813), (0, 0))
            Line((0, 0), (FILLET_1_R * 0.414213562373, 0))
        make_face()
    extrude(amount=230.710678119, mode=Mode.SUBTRACT)

    # 草图23 → 凸台-拉伸14 (add)
    with BuildSketch(Plane(origin=(0, 5.5, 0), x_dir=(1, 0, 0), z_dir=(0, 1, 0))):
        Polygon((23.75, -27), (23.75, -44), (15, -44), align=None)
        Polygon((76.25, -27), (76.25, -44), (85, -44), align=None)
        Polygon((133.75, -27), (133.75, -44), (125, -44), align=None)
        Polygon((186.25, -27), (186.25, -44), (195, -44), align=None)
    extrude(amount=-EXTRUDE_14_DEPTH)

    # 草图26 → 凸台-拉伸15 (add)
    with BuildSketch(Plane(origin=(0, 5.5, 0), x_dir=(1, 0, 0), z_dir=(0, 1, 0))):
        with Locations((-12.5, -116.033101918)):
            Rectangle(SKETCH_26_W, SKETCH_26_H)
        with Locations((222.5, -116.033101918)):
            Rectangle(SKETCH_26_W, SKETCH_26_H)
    extrude(amount=-EXTRUDE_15_DEPTH)

    # 圆角2
    fillet_2_edges = [part.edges().sort_by_distance(p)[0] for p in [
        (0, 2.75, 161.033101918),
        (-25, 2.75, 161.033101918),
        (-25, 2.75, 71.033101918),
        (0, 2.75, 71.033101918),
        (235, 2.75, 161.033101918),
        (210, 2.75, 161.033101918),
        (210, 2.75, 71.033101918),
        (235, 2.75, 71.033101918),
    ]]
    fillet(fillet_2_edges, radius=FILLET_2_R)

    # 倒角1
    chamfer_1_edges = [part.edges().sort_by_distance(p)[0] for p in [
        (15, 3, 186),
        (15, 3, 220),
        (195, 3, 220),
        (195, 3, 186),
        (85, 2.75, 220),
        (85, 2.75, 186),
        (125, 2.75, 186),
        (125, 2.75, 220),
    ]]
    chamfer(chamfer_1_edges, length=CHAMFER_1_SIZE)

    # 倒角2
    chamfer_2_edges = [part.edges().sort_by_distance(p)[0] for p in [
        (58.75, 3, 44),
        (41.25, 3, 44),
        (168.75, 3, 44),
        (151.25, 3, 44),
        (23.75, 3, 44),
        (76.25, 3, 44),
        (133.75, 3, 44),
        (186.25, 3, 44),
    ]]
    chamfer(chamfer_2_edges, length=CHAMFER_2_SIZE)

    # 圆角3
    fillet_3_edges = [part.edges().sort_by_distance(p)[0] for p in [
        (32.5, 3, 10),
        (67.5, 3, 10),
        (142.5, 3, 10),
        (177.5, 3, 10),
    ]]
    fillet(fillet_3_edges, radius=FILLET_3_R)


solid = part.part
